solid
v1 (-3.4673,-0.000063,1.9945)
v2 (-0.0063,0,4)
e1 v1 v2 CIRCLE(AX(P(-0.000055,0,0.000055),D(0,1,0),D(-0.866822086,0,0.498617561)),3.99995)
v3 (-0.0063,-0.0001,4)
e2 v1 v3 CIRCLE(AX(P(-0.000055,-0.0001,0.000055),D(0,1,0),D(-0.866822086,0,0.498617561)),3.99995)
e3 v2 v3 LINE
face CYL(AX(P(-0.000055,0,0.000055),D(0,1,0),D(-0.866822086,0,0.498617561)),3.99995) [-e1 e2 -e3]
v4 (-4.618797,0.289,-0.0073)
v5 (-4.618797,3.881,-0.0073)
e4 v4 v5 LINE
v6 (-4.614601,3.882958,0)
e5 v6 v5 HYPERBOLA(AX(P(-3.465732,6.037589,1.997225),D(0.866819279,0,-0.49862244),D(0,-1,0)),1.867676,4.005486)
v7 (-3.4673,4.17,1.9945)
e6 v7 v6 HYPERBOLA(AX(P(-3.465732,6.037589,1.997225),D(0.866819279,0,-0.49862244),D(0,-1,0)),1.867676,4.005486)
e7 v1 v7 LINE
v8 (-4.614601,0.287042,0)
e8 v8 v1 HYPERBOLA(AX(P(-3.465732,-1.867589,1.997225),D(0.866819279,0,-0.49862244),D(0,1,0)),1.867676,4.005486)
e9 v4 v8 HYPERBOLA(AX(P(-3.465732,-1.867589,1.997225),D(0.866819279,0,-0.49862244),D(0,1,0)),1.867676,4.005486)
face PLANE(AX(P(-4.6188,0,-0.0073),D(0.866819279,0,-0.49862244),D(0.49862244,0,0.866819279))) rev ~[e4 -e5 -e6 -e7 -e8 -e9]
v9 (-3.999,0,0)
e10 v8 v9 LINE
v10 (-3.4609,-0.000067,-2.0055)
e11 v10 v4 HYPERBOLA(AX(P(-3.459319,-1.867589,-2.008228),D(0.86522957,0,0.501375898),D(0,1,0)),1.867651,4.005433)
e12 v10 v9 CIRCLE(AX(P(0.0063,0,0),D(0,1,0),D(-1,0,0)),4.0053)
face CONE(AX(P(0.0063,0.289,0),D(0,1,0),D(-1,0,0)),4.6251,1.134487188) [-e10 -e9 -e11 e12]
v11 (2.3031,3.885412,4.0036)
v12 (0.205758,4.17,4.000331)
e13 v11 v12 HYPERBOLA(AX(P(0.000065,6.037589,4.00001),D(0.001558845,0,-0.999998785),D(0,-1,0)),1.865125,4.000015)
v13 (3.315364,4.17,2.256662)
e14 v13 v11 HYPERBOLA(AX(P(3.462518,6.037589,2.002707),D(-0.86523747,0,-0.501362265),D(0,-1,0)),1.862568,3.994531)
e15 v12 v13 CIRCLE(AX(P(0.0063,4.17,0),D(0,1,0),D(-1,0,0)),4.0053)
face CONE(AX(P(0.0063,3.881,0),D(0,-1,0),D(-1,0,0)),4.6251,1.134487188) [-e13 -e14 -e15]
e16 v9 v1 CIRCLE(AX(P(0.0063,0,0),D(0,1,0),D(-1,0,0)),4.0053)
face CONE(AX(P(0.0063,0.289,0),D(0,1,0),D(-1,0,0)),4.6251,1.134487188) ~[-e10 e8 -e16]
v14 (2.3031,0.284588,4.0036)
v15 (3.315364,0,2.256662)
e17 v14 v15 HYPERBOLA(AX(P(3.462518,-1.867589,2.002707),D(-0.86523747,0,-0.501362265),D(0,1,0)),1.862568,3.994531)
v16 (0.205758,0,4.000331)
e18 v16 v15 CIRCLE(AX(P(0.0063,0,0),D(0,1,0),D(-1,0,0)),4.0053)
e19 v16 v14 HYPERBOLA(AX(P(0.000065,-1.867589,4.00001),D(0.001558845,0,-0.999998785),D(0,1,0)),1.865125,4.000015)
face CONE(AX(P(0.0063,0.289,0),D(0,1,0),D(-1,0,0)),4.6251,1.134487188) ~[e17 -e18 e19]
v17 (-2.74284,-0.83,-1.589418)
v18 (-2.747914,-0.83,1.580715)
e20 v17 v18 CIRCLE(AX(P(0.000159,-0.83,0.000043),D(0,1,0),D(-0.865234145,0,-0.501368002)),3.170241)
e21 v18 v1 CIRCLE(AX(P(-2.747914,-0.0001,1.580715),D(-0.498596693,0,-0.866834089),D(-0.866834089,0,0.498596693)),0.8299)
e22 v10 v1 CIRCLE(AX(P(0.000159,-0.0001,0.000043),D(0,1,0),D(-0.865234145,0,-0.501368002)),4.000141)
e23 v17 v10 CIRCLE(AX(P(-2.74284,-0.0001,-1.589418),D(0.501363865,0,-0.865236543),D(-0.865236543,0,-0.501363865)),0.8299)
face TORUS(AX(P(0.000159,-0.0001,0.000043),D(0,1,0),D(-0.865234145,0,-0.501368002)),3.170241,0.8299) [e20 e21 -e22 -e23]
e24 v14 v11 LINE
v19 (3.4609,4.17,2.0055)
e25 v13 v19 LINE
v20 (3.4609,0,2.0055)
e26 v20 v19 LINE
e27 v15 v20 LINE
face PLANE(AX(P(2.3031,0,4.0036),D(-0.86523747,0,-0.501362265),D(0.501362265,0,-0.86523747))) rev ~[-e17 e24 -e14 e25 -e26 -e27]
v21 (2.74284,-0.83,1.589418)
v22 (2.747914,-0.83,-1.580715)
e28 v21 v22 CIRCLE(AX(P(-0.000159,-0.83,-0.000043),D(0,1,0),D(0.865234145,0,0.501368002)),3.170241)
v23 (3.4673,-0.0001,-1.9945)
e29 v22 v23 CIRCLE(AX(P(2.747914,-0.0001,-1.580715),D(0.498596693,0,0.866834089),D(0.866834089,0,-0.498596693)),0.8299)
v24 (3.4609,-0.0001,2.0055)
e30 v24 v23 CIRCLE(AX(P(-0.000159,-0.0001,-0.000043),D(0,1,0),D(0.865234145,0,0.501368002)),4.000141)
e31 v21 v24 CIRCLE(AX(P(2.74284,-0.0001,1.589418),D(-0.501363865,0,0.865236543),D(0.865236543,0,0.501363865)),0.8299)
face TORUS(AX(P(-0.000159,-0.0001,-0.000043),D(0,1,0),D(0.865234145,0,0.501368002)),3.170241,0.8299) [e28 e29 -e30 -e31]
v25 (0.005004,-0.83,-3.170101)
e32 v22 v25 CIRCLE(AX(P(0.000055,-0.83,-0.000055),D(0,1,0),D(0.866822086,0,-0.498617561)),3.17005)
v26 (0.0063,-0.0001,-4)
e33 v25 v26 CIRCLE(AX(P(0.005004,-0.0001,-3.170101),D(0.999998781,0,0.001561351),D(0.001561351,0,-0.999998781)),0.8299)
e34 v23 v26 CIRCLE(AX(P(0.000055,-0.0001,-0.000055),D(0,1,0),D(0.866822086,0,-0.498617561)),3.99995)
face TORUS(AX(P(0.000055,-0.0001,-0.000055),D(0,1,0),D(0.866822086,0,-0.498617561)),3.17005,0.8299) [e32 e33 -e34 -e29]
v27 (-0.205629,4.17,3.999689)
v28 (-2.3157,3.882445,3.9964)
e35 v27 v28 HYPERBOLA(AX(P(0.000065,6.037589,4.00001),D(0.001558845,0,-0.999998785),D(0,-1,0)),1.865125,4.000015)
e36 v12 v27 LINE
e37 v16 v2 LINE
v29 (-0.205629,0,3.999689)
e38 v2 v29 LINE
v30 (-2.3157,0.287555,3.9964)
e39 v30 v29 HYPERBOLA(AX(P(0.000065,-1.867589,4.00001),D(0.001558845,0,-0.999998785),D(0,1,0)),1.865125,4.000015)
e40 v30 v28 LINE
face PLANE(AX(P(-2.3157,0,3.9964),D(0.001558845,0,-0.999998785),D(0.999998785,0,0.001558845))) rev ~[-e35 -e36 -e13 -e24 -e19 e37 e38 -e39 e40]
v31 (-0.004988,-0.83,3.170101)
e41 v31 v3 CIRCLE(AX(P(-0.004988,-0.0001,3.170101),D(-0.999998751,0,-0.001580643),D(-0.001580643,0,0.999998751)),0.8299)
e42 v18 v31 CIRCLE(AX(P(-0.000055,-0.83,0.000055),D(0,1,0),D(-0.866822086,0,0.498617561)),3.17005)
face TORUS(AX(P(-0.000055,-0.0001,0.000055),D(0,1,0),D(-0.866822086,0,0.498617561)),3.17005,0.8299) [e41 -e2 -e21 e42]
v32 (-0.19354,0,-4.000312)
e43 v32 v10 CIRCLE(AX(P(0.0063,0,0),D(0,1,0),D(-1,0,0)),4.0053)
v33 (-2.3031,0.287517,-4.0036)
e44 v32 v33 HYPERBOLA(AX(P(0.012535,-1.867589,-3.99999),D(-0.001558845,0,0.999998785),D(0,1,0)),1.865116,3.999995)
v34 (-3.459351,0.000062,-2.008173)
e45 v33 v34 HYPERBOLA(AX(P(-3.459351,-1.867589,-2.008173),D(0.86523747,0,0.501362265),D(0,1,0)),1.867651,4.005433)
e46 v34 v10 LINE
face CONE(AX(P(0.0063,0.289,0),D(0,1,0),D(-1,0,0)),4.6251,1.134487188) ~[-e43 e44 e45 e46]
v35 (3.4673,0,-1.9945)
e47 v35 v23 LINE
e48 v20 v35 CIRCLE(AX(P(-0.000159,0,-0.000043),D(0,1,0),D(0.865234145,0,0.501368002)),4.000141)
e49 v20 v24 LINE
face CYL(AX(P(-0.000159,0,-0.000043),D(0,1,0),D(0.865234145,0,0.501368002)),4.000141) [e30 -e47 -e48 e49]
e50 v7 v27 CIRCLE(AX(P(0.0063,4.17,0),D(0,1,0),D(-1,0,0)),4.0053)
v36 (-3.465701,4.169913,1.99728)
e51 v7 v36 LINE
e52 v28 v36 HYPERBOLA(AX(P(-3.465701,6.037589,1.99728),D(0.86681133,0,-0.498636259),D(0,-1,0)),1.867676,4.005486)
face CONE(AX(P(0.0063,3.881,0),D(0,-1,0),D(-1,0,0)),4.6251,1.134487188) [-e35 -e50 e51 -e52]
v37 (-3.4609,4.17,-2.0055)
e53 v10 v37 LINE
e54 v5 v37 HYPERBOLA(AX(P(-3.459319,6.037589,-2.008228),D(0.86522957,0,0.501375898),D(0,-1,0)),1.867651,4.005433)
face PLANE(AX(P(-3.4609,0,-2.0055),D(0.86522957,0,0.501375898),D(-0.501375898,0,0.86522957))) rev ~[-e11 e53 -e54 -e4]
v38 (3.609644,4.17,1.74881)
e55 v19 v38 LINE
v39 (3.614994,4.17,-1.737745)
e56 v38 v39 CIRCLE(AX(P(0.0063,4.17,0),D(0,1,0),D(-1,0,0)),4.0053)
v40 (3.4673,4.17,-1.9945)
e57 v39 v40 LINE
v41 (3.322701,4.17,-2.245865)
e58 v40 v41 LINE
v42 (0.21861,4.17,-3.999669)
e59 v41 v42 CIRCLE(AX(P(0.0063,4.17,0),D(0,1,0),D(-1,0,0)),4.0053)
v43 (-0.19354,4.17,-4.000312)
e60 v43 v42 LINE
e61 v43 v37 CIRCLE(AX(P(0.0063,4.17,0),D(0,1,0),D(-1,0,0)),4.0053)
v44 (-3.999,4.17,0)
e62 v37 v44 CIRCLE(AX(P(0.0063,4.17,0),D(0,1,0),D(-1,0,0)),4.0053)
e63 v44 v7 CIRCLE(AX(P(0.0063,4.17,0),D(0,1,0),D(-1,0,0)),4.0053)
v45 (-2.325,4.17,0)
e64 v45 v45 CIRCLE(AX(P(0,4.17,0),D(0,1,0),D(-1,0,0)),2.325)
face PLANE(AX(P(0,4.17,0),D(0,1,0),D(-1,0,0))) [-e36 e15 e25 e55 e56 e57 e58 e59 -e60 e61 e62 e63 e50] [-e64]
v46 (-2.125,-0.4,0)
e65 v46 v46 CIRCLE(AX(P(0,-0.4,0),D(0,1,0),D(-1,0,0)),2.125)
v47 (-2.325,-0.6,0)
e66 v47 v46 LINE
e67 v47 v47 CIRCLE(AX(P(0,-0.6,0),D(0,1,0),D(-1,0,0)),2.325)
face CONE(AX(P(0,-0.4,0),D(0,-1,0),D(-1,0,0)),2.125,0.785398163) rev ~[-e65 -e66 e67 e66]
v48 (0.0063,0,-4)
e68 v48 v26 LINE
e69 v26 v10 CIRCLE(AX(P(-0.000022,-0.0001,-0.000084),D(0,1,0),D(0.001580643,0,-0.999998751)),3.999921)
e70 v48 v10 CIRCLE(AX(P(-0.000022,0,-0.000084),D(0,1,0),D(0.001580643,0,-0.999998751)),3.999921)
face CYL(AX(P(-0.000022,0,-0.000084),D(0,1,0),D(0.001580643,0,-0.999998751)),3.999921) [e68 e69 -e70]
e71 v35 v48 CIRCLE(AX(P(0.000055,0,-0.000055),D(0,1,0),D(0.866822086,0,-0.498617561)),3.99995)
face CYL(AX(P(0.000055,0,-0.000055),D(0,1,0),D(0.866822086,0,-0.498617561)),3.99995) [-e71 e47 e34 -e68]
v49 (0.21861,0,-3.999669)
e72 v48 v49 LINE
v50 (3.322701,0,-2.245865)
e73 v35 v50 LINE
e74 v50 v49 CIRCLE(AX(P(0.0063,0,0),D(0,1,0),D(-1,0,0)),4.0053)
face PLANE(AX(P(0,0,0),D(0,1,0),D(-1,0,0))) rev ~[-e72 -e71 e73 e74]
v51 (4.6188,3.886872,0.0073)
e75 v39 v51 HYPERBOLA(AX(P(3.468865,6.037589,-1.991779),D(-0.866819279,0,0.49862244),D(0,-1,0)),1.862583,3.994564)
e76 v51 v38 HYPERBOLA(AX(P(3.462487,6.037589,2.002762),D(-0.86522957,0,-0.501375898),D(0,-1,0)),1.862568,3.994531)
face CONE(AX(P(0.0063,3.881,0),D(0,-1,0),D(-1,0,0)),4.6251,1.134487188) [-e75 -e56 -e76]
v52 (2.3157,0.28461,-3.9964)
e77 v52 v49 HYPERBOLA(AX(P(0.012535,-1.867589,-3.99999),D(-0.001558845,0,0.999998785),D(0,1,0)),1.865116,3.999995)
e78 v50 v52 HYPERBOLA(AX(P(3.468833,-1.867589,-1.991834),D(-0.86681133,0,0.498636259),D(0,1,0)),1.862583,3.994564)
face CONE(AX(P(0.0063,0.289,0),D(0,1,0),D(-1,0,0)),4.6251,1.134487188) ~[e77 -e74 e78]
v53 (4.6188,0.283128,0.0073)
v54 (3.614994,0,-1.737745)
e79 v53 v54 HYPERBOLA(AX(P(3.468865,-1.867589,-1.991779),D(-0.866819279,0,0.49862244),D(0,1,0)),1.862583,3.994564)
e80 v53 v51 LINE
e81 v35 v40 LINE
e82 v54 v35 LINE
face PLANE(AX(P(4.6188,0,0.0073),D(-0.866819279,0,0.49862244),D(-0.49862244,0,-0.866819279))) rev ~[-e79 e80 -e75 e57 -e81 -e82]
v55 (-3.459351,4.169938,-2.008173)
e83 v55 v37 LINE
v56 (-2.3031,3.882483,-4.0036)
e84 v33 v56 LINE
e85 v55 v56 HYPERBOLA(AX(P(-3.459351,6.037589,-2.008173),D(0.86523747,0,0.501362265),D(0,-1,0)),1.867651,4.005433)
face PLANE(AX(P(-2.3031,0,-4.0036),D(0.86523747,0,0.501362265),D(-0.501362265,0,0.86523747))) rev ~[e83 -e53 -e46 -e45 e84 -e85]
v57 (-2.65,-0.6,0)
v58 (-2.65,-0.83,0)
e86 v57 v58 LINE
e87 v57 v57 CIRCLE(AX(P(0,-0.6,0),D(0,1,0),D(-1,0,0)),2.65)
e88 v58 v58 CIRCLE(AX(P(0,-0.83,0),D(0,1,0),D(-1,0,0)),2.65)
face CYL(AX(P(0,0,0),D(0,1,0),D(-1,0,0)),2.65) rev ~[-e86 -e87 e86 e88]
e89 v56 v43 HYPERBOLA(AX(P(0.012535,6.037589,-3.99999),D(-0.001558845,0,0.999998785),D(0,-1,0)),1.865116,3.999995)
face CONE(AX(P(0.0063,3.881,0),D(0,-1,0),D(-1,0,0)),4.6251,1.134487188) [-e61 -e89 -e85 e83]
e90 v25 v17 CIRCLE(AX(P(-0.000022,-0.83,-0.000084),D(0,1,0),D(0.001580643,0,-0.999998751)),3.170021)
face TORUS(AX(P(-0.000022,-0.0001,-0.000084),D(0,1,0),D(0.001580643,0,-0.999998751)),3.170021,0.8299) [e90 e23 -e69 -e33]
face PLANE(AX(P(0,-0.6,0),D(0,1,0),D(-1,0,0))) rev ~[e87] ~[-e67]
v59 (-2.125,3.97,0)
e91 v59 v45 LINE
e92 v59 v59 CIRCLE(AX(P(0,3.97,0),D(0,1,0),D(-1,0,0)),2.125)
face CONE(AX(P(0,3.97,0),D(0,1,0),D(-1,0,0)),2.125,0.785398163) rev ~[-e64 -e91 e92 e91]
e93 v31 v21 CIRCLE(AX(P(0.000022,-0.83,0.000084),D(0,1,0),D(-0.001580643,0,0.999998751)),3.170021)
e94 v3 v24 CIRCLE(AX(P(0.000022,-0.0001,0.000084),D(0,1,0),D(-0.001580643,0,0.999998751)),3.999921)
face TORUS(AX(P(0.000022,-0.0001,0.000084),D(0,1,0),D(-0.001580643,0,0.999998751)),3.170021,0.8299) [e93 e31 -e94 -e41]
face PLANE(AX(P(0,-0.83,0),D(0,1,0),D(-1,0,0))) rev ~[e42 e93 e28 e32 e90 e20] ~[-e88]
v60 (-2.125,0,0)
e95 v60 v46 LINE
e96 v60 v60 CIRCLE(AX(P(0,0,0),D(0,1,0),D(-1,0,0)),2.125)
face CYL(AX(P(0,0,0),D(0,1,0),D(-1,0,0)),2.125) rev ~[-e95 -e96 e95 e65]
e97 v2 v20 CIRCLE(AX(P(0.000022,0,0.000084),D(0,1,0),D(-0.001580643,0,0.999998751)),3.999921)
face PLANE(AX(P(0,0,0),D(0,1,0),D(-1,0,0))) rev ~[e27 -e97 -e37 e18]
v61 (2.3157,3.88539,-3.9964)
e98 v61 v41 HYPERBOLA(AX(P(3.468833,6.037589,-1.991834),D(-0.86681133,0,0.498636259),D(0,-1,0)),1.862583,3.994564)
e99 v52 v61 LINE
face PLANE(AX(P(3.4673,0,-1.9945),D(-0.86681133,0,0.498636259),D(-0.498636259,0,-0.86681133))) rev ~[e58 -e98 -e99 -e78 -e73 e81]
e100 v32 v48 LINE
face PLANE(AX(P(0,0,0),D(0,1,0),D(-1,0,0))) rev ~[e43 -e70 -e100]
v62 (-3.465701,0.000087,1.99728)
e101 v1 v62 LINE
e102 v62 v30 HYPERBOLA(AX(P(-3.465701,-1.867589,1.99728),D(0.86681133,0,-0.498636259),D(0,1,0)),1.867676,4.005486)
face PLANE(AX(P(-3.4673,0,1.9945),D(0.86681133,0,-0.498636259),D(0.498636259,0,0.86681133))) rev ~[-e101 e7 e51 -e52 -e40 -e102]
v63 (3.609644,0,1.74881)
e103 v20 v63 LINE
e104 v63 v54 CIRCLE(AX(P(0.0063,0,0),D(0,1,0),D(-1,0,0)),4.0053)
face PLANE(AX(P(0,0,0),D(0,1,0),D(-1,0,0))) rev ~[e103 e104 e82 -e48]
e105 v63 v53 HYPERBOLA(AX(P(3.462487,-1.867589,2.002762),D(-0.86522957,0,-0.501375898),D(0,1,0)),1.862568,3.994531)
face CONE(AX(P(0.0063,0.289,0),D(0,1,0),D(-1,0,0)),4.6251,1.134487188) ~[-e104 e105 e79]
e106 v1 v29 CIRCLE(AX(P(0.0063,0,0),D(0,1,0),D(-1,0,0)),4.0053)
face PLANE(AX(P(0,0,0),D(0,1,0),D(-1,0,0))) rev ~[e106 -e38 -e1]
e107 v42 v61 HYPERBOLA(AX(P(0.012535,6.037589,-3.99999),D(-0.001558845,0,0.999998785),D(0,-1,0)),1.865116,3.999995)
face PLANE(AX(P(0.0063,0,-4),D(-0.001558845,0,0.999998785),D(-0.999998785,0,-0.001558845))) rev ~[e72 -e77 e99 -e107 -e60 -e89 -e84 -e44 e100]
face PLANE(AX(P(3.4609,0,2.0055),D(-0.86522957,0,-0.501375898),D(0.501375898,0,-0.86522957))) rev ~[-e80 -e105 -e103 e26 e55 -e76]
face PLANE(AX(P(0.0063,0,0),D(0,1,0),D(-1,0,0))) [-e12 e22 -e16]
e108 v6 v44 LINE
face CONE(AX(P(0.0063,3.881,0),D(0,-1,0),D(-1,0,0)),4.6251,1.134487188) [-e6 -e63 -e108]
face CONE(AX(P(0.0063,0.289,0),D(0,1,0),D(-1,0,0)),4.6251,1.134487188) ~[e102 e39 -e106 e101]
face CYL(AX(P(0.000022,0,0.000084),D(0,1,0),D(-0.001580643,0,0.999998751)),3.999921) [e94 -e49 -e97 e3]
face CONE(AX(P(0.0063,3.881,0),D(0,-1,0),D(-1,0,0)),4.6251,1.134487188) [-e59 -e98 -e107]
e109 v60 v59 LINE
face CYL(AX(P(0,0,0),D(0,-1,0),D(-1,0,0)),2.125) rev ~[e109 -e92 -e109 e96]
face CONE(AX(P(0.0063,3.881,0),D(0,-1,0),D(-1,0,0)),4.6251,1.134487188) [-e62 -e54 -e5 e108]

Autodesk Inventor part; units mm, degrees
ref_plane "YZ Plane" through (0, 0, 0) normal (1, 0, 0) x (0, 1, 0)
ref_plane "XZ Plane" through (0, 0, 0) normal (0, 1, 0) x (-1, 0, 0)
ref_plane "XY Plane" through (0, 0, 0) normal (0, 0, 1) x (1, 0, 0)
sketch "Sketch1" plane through (0, 0, 0) normal (0, 1, 0) x (-1, 0, 0)
  circle A0 centre (0, 0) radius 3.17
  circle A1 centre (0, 0) radius 2.65
  circle A2 centre (0, 0) radius 2.125
  line L0 (0.0063, 4) -> (-2.3031, 4.0036)
  line L1 (2.3157, 3.9964) -> (0.0063, 4)
  arc A3 (3.4673, 1.9945) -> (0.0063, 4) centre (0, 0) ccw
  line L2 (3.4673, 1.9945) -> (2.3157, 3.9964)
  line L3 (4.6188, -0.0073) -> (3.4673, 1.9945)
  arc A4 (3.4609, -2.0055) -> (3.4673, 1.9945) centre (0, 0) ccw
  line L4 (3.4609, -2.0055) -> (4.6188, -0.0073)
  arc A5 (-0.0063, -4) -> (3.4609, -2.0055) centre (0, 0) ccw
  line L5 (2.3031, -4.0036) -> (3.4609, -2.0055)
  line L6 (-0.0063, -4) -> (2.3031, -4.0036)
  arc A6 (-3.4673, -1.9945) -> (-0.0063, -4) centre (0, 0) ccw
  line L7 (-2.3157, -3.9964) -> (-0.0063, -4)
  line L8 (-3.4673, -1.9945) -> (-2.3157, -3.9964)
  line L9 (-4.6188, 0.0073) -> (-3.4673, -1.9945)
  arc A7 (-3.4609, 2.0055) -> (-3.4673, -1.9945) centre (0, 0) ccw
  line L10 (-3.4609, 2.0055) -> (-4.6188, 0.0073)
  arc A8 (0.0063, 4) -> (-3.4609, 2.0055) centre (0, 0) ccw
  line L11 (-2.3031, 4.0036) -> (-3.4609, 2.0055)
extrude "Extrusion1" add sketch "Sketch1" along normal blind 4.17 contours A0 | A1 | A8 L11 L0 | L1 L2 A3 | A3 A4 A5 A6 A7 A8 | L3 L4 A4 | A7 L9 L10 | L5 L6 A5 | A6 L7 L8
extrude "Extrusion2" add sketch "Sketch1" against normal blind 0.83 contours A0 | A3 A4 A5 A6 A7 A8
extrude "Extrusion3" add sketch "Sketch1" against normal blind 0.6 contours A1
fillet "Fillet1" radius 0.83 1 edges at (3.4609, -0.83, 2.0055)
thread "Thread1" size "M4.5x0.75" class "6H" standard "ANSI Metric M Profile" full length
sketch "Sketch2" plane through (0, 0, 0) normal (0, 0, 1) x (1, 0, 0)
  line L0 (-4.6188, 0) -> (-3.4673, 0) projected
  line L1 (-4.6188, 0) -> (-4.6188, 4.17) projected
  line L2 (-4.6188, 4.17) -> (-2.3157, 4.17) projected
  line L3 (2.3157, 0) -> (0.0063, 0) projected
  line L4 (0.0063, 0) -> (0.0063, 2.976)
  line L5 (-4.6188, 0.289) -> (-3.999, 0)
  line L6 (-4.6188, 3.881) -> (-3.999, 4.17)
  line L7 (-2.3031, 4.17) -> (-4.6188, 4.17) projected
  line L8 (-3.999, 4.17) -> (-4.6188, 4.17)
  line L9 (-4.6188, 3.881) -> (-4.6188, 4.17)
  line L10 (-4.6188, 0.289) -> (-4.6188, 0)
  line L11 (-3.4609, 0) -> (-4.6188, 0) projected
  line L12 (-3.999, 0) -> (-4.6188, 0)
  point P0 (0, 0)
  dimension "d10" = 0.289
  dimension "d11" = 0.289
  dimension "d14" = 65
  dimension "d15" = 65
revolve "Revolution1" cut sketch "Sketch2" angle 360 about axis through (0.0063, 0, 0) along (0, 1, 0)
chamfer "Chamfer1" distance 0.2 angle 45 2 edges at (2.125, 4.17, 0) (2.125, -0.6, 0)
properties part number "Nylon Insert Lock Nut M5" material "Steel"
